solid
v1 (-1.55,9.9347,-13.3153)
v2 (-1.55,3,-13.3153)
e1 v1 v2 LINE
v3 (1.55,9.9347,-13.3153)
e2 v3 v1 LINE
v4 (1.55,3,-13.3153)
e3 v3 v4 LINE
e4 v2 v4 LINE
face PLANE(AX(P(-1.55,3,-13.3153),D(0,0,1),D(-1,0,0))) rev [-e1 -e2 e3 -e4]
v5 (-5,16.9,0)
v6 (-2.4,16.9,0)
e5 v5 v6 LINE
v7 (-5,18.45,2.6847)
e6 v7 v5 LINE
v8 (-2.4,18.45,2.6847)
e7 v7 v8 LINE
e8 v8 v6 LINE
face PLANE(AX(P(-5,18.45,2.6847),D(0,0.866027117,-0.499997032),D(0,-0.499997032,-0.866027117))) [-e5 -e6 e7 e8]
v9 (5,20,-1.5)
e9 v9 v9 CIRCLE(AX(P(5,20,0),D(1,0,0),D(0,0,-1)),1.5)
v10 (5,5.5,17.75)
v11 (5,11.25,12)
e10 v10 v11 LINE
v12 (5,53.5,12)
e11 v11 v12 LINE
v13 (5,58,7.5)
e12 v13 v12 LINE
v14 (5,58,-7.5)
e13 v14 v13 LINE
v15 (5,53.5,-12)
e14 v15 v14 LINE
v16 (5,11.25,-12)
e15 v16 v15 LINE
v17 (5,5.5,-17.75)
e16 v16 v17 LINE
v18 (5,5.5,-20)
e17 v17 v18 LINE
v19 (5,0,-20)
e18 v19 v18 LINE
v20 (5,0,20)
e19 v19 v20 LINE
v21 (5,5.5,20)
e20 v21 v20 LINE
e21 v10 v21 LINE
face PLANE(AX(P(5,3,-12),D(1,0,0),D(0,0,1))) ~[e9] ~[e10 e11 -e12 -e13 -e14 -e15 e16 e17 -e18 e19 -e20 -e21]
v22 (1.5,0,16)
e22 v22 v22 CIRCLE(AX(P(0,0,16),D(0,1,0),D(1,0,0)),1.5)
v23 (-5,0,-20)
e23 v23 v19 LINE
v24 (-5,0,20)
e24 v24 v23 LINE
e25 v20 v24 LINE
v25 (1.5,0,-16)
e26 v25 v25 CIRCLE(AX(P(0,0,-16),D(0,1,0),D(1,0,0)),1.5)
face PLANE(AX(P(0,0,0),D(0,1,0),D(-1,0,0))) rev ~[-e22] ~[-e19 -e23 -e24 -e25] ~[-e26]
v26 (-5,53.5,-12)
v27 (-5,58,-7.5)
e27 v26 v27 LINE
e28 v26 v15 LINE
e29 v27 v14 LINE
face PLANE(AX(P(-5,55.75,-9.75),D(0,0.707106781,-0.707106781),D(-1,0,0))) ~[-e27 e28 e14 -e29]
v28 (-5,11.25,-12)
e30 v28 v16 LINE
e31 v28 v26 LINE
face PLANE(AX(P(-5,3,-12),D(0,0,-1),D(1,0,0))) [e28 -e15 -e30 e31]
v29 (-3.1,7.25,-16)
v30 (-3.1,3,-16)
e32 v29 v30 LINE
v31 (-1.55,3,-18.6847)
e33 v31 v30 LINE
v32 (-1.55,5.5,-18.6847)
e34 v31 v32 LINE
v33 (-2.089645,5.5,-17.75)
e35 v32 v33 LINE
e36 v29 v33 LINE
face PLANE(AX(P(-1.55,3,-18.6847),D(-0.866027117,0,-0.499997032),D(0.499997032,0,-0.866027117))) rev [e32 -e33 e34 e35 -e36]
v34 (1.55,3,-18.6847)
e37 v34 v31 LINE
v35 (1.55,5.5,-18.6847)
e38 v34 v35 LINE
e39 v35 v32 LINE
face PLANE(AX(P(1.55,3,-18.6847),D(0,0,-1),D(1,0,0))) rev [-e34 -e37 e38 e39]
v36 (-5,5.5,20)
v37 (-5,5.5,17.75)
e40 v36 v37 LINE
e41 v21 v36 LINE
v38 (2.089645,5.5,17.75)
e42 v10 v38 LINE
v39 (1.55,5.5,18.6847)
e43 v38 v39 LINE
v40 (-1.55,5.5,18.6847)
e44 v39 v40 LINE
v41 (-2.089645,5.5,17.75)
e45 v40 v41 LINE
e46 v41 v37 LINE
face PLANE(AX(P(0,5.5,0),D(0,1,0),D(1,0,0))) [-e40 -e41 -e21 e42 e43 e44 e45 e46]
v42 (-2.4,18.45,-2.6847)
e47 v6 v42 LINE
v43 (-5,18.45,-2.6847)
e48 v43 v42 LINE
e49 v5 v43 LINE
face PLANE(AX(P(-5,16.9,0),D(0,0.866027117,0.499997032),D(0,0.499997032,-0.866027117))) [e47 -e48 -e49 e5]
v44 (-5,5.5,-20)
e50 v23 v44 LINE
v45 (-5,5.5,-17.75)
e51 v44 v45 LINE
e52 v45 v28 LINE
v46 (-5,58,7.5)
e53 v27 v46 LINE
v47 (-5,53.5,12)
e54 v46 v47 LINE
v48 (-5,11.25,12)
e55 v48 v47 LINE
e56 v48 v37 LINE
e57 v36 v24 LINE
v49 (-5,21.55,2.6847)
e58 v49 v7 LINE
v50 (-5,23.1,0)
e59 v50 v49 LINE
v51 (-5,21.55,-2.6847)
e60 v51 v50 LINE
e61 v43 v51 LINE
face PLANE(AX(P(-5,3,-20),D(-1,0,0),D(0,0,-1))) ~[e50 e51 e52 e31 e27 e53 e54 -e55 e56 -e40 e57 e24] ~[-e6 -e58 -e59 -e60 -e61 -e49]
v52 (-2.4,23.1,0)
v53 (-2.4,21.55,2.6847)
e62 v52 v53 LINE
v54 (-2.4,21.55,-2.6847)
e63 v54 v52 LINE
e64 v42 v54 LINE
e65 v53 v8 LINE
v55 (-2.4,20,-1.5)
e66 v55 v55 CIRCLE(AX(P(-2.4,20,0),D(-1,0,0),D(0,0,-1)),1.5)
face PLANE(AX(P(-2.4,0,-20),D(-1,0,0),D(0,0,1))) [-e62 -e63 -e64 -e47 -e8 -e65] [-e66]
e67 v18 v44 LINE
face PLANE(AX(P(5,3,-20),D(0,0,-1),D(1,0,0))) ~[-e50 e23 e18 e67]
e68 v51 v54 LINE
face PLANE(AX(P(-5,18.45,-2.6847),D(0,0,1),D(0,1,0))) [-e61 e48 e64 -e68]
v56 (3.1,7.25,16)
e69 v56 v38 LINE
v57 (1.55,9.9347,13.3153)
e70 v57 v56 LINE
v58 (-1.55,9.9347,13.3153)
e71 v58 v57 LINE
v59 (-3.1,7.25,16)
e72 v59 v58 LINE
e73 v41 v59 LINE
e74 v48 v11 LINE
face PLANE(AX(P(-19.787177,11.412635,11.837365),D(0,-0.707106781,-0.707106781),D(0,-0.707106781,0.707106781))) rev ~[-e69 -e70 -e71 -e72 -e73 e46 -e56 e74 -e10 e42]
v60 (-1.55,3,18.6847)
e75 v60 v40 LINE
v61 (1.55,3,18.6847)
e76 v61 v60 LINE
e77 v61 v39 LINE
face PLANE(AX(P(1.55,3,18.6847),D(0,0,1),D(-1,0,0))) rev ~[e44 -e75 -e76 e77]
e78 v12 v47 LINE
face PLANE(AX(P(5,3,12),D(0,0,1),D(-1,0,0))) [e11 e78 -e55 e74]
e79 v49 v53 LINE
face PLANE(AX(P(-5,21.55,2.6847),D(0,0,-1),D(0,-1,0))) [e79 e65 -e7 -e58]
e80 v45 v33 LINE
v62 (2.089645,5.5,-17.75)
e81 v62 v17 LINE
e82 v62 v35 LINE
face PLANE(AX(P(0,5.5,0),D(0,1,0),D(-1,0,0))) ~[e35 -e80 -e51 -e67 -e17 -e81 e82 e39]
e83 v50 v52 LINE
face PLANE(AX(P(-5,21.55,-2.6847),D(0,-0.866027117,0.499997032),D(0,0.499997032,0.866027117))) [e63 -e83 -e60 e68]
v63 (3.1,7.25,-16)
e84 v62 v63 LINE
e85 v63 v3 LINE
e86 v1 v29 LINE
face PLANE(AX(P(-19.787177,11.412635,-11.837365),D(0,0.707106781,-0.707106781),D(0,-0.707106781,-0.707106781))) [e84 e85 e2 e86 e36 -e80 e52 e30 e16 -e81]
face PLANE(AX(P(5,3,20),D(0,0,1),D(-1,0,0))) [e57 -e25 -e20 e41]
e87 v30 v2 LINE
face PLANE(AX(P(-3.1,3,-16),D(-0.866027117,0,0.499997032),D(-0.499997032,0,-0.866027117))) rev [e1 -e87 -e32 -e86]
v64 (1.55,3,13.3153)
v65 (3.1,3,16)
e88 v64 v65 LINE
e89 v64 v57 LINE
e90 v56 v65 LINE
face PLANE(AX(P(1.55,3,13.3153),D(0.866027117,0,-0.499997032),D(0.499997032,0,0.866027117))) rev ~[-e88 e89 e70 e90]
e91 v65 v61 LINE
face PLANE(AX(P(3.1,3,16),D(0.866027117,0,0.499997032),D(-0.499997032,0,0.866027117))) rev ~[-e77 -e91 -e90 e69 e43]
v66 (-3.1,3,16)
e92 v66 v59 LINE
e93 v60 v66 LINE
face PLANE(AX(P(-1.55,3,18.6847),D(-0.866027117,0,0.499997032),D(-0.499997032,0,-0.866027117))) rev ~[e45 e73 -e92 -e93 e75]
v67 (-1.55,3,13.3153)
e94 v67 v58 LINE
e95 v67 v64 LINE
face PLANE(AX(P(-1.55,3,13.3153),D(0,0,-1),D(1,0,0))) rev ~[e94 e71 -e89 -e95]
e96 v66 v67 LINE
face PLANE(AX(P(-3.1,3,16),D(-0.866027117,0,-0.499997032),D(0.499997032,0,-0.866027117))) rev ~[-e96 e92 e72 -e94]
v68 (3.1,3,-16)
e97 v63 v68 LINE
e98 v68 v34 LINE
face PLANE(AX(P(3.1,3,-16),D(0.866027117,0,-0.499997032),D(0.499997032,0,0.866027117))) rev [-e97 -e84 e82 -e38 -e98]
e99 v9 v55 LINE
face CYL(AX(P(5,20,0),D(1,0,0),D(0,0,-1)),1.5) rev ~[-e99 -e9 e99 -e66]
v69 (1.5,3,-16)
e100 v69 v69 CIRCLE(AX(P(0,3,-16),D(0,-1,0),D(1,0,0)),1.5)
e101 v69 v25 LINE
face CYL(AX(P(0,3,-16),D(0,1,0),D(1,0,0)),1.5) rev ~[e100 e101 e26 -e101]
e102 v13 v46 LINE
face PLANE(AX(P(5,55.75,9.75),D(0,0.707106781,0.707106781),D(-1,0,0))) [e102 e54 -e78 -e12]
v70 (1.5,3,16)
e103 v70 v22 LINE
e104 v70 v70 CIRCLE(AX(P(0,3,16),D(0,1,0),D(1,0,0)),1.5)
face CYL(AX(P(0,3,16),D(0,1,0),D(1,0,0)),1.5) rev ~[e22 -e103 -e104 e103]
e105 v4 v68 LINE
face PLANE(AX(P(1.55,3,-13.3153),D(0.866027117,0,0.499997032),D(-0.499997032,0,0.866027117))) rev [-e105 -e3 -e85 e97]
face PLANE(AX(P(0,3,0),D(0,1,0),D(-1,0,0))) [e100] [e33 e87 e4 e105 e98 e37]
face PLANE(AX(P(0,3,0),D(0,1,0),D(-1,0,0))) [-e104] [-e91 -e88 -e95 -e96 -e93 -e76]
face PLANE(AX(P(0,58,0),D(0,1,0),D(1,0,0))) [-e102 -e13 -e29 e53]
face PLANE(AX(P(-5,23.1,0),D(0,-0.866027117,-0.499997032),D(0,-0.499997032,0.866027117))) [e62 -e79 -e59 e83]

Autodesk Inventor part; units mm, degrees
ref_plane "YZ Plane" through (0, 0, 0) normal (1, 0, 0) x (0, 1, 0)
ref_plane "XZ Plane" through (0, 0, 0) normal (0, 1, 0) x (-1, 0, 0)
ref_plane "XY Plane" through (0, 0, 0) normal (0, 0, 1) x (1, 0, 0)
sketch "Эскиз1" plane through (0, 0, 0) normal (0, 1, 0) x (-1, 0, 0)
  line L0 (-5, 20) -> (5, 20)
  line L1 (5, 20) -> (5, -20)
  line L2 (5, -20) -> (-5, -20)
  line L3 (-5, -20) -> (-5, 20)
  line L4 (-5, 20) -> (5, -20) construction
  line L5 (5, 20) -> (-5, -20) construction
  point P0 (0, 0)
  dimension "d0" = 10
  dimension "d1" = 40
extrude "Выдавливание1" add sketch "Эскиз1" along normal blind 3
sketch "Эскиз2" plane through (0, 3, 0) normal (0, 1, 0) x (1, 0, 0)
  line L0 (-5, 20) -> (-5, -20) projected
  line L1 (5, -12) -> (-5, -12)
  line L2 (-5, -12) -> (-5, 12)
  line L3 (-5, 12) -> (5, 12)
  line L4 (5, 12) -> (5, -12)
  line L5 (5, -12) -> (-5, 12) construction
  line L6 (-5, -12) -> (5, 12) construction
  point P0 (0, 0)
  dimension "d4" = 24
extrude "Выдавливание2" add sketch "Эскиз2" along normal blind 55
sketch "Эскиз3" plane through (0, 3, 0) normal (0, 1, 0) x (1, 0, 0)
  circle A0 centre (0, -16) radius 1.5
  line L0 (-5, -12) -> (-5, -20) projected
  line L1 (-5, -20) -> (5, -20) projected
  point P0 (0, 0)
  dimension "d7" = 3
  dimension "d8" = 5
  dimension "d9" = 4
extrude "Выдавливание3" cut sketch "Эскиз3" against normal blind 20
mirror "Зеркальное отражение1" about plane through (0, 0, 0) normal (0, 0, 1) of "Выдавливание3"
sketch "Эскиз4" plane through (0, 3, 0) normal (0, 1, 0) x (1, 0, 0)
  circle A0 centre (0, -16) radius 1.5 projected
  line L0 (-3.1, -16) -> (-1.55, -13.3153)
  line L1 (-1.55, -13.3153) -> (1.55, -13.3153)
  line L2 (1.55, -13.3153) -> (3.1, -16)
  line L3 (3.1, -16) -> (1.55, -18.6847)
  line L4 (1.55, -18.6847) -> (-1.55, -18.6847)
  line L5 (-1.55, -18.6847) -> (-3.1, -16)
  line L6 (-5, -12) -> (5, -12) projected
  line L7 (5, -20) -> (-5, -20)
  line L8 (-5, -20) -> (-5, -12)
  line L9 (-5, -12) -> (5, -12)
  line L10 (5, -12) -> (5, -20)
  line L11 (5, -20) -> (-5, -12) construction
  line L12 (-5, -20) -> (5, -12) construction
  point P0 (0, 0)
  dimension "d12" = 6.2
extrude "Выдавливание4" add sketch "Эскиз4" along normal blind 2.5 contours L6 L10 L7 L8
mirror "Зеркальное отражение2" about plane through (0, 0, 0) normal (0, 0, 1) of "Выдавливание4"
sketch "Эскиз5" plane through (5, 0, 20) normal (1, 0, 0) x (0, 0, -1)
  circle A0 centre (20, 20) radius 1.5
  line L0 (40, 0) -> (0, 0) projected
  point P0 (20, 0)
  dimension "d16" = 3
  dimension "d29" = 20
extrude "Выдавливание5" cut sketch "Эскиз5" against normal blind 27.5
sketch "Эскиз6" plane through (-5, 0, -20) normal (-1, 0, 0) x (0, 0, 1)
  circle A0 centre (20, 20) radius 1.5 projected
  line L0 (20, 23.1) -> (22.6847, 21.55)
  line L1 (22.6847, 21.55) -> (22.6847, 18.45)
  line L2 (22.6847, 18.45) -> (20, 16.9)
  line L3 (20, 16.9) -> (17.3153, 18.45)
  line L4 (17.3153, 18.45) -> (17.3153, 21.55)
  line L5 (17.3153, 21.55) -> (20, 23.1)
  point P0 (20, 0)
  point P1 (0, 0)
  dimension "d20" = 6.2
extrude "Выдавливание6" cut sketch "Эскиз6" against normal blind 2.6
chamfer "Фаска1" distance 4.5 angle 45 2 edges at (0, 58, 12) (0, 58, -12)
chamfer "Фаска2" distance 5.75 angle 45 2 edges at (0, 5.5, 12) (0, 5.5, -12)
sketch "Эскиз7" plane through (0, 0, 0) normal (0, -1, 0) x (1, 0, 0)
  circle A0 centre (0, -16) radius 1.5 projected
  circle A1 centre (0, 16) radius 1.5 projected
  line L0 (5, 20) -> (-5, 20) projected
  line L1 (-5, 20) -> (-5, -20) projected
  line L2 (-5, -20) -> (5, -20) projected
  line L3 (5, -20) -> (5, 20) projected
  point P0 (0, 0)
properties part number "000.209 - Крепеж крышки"
